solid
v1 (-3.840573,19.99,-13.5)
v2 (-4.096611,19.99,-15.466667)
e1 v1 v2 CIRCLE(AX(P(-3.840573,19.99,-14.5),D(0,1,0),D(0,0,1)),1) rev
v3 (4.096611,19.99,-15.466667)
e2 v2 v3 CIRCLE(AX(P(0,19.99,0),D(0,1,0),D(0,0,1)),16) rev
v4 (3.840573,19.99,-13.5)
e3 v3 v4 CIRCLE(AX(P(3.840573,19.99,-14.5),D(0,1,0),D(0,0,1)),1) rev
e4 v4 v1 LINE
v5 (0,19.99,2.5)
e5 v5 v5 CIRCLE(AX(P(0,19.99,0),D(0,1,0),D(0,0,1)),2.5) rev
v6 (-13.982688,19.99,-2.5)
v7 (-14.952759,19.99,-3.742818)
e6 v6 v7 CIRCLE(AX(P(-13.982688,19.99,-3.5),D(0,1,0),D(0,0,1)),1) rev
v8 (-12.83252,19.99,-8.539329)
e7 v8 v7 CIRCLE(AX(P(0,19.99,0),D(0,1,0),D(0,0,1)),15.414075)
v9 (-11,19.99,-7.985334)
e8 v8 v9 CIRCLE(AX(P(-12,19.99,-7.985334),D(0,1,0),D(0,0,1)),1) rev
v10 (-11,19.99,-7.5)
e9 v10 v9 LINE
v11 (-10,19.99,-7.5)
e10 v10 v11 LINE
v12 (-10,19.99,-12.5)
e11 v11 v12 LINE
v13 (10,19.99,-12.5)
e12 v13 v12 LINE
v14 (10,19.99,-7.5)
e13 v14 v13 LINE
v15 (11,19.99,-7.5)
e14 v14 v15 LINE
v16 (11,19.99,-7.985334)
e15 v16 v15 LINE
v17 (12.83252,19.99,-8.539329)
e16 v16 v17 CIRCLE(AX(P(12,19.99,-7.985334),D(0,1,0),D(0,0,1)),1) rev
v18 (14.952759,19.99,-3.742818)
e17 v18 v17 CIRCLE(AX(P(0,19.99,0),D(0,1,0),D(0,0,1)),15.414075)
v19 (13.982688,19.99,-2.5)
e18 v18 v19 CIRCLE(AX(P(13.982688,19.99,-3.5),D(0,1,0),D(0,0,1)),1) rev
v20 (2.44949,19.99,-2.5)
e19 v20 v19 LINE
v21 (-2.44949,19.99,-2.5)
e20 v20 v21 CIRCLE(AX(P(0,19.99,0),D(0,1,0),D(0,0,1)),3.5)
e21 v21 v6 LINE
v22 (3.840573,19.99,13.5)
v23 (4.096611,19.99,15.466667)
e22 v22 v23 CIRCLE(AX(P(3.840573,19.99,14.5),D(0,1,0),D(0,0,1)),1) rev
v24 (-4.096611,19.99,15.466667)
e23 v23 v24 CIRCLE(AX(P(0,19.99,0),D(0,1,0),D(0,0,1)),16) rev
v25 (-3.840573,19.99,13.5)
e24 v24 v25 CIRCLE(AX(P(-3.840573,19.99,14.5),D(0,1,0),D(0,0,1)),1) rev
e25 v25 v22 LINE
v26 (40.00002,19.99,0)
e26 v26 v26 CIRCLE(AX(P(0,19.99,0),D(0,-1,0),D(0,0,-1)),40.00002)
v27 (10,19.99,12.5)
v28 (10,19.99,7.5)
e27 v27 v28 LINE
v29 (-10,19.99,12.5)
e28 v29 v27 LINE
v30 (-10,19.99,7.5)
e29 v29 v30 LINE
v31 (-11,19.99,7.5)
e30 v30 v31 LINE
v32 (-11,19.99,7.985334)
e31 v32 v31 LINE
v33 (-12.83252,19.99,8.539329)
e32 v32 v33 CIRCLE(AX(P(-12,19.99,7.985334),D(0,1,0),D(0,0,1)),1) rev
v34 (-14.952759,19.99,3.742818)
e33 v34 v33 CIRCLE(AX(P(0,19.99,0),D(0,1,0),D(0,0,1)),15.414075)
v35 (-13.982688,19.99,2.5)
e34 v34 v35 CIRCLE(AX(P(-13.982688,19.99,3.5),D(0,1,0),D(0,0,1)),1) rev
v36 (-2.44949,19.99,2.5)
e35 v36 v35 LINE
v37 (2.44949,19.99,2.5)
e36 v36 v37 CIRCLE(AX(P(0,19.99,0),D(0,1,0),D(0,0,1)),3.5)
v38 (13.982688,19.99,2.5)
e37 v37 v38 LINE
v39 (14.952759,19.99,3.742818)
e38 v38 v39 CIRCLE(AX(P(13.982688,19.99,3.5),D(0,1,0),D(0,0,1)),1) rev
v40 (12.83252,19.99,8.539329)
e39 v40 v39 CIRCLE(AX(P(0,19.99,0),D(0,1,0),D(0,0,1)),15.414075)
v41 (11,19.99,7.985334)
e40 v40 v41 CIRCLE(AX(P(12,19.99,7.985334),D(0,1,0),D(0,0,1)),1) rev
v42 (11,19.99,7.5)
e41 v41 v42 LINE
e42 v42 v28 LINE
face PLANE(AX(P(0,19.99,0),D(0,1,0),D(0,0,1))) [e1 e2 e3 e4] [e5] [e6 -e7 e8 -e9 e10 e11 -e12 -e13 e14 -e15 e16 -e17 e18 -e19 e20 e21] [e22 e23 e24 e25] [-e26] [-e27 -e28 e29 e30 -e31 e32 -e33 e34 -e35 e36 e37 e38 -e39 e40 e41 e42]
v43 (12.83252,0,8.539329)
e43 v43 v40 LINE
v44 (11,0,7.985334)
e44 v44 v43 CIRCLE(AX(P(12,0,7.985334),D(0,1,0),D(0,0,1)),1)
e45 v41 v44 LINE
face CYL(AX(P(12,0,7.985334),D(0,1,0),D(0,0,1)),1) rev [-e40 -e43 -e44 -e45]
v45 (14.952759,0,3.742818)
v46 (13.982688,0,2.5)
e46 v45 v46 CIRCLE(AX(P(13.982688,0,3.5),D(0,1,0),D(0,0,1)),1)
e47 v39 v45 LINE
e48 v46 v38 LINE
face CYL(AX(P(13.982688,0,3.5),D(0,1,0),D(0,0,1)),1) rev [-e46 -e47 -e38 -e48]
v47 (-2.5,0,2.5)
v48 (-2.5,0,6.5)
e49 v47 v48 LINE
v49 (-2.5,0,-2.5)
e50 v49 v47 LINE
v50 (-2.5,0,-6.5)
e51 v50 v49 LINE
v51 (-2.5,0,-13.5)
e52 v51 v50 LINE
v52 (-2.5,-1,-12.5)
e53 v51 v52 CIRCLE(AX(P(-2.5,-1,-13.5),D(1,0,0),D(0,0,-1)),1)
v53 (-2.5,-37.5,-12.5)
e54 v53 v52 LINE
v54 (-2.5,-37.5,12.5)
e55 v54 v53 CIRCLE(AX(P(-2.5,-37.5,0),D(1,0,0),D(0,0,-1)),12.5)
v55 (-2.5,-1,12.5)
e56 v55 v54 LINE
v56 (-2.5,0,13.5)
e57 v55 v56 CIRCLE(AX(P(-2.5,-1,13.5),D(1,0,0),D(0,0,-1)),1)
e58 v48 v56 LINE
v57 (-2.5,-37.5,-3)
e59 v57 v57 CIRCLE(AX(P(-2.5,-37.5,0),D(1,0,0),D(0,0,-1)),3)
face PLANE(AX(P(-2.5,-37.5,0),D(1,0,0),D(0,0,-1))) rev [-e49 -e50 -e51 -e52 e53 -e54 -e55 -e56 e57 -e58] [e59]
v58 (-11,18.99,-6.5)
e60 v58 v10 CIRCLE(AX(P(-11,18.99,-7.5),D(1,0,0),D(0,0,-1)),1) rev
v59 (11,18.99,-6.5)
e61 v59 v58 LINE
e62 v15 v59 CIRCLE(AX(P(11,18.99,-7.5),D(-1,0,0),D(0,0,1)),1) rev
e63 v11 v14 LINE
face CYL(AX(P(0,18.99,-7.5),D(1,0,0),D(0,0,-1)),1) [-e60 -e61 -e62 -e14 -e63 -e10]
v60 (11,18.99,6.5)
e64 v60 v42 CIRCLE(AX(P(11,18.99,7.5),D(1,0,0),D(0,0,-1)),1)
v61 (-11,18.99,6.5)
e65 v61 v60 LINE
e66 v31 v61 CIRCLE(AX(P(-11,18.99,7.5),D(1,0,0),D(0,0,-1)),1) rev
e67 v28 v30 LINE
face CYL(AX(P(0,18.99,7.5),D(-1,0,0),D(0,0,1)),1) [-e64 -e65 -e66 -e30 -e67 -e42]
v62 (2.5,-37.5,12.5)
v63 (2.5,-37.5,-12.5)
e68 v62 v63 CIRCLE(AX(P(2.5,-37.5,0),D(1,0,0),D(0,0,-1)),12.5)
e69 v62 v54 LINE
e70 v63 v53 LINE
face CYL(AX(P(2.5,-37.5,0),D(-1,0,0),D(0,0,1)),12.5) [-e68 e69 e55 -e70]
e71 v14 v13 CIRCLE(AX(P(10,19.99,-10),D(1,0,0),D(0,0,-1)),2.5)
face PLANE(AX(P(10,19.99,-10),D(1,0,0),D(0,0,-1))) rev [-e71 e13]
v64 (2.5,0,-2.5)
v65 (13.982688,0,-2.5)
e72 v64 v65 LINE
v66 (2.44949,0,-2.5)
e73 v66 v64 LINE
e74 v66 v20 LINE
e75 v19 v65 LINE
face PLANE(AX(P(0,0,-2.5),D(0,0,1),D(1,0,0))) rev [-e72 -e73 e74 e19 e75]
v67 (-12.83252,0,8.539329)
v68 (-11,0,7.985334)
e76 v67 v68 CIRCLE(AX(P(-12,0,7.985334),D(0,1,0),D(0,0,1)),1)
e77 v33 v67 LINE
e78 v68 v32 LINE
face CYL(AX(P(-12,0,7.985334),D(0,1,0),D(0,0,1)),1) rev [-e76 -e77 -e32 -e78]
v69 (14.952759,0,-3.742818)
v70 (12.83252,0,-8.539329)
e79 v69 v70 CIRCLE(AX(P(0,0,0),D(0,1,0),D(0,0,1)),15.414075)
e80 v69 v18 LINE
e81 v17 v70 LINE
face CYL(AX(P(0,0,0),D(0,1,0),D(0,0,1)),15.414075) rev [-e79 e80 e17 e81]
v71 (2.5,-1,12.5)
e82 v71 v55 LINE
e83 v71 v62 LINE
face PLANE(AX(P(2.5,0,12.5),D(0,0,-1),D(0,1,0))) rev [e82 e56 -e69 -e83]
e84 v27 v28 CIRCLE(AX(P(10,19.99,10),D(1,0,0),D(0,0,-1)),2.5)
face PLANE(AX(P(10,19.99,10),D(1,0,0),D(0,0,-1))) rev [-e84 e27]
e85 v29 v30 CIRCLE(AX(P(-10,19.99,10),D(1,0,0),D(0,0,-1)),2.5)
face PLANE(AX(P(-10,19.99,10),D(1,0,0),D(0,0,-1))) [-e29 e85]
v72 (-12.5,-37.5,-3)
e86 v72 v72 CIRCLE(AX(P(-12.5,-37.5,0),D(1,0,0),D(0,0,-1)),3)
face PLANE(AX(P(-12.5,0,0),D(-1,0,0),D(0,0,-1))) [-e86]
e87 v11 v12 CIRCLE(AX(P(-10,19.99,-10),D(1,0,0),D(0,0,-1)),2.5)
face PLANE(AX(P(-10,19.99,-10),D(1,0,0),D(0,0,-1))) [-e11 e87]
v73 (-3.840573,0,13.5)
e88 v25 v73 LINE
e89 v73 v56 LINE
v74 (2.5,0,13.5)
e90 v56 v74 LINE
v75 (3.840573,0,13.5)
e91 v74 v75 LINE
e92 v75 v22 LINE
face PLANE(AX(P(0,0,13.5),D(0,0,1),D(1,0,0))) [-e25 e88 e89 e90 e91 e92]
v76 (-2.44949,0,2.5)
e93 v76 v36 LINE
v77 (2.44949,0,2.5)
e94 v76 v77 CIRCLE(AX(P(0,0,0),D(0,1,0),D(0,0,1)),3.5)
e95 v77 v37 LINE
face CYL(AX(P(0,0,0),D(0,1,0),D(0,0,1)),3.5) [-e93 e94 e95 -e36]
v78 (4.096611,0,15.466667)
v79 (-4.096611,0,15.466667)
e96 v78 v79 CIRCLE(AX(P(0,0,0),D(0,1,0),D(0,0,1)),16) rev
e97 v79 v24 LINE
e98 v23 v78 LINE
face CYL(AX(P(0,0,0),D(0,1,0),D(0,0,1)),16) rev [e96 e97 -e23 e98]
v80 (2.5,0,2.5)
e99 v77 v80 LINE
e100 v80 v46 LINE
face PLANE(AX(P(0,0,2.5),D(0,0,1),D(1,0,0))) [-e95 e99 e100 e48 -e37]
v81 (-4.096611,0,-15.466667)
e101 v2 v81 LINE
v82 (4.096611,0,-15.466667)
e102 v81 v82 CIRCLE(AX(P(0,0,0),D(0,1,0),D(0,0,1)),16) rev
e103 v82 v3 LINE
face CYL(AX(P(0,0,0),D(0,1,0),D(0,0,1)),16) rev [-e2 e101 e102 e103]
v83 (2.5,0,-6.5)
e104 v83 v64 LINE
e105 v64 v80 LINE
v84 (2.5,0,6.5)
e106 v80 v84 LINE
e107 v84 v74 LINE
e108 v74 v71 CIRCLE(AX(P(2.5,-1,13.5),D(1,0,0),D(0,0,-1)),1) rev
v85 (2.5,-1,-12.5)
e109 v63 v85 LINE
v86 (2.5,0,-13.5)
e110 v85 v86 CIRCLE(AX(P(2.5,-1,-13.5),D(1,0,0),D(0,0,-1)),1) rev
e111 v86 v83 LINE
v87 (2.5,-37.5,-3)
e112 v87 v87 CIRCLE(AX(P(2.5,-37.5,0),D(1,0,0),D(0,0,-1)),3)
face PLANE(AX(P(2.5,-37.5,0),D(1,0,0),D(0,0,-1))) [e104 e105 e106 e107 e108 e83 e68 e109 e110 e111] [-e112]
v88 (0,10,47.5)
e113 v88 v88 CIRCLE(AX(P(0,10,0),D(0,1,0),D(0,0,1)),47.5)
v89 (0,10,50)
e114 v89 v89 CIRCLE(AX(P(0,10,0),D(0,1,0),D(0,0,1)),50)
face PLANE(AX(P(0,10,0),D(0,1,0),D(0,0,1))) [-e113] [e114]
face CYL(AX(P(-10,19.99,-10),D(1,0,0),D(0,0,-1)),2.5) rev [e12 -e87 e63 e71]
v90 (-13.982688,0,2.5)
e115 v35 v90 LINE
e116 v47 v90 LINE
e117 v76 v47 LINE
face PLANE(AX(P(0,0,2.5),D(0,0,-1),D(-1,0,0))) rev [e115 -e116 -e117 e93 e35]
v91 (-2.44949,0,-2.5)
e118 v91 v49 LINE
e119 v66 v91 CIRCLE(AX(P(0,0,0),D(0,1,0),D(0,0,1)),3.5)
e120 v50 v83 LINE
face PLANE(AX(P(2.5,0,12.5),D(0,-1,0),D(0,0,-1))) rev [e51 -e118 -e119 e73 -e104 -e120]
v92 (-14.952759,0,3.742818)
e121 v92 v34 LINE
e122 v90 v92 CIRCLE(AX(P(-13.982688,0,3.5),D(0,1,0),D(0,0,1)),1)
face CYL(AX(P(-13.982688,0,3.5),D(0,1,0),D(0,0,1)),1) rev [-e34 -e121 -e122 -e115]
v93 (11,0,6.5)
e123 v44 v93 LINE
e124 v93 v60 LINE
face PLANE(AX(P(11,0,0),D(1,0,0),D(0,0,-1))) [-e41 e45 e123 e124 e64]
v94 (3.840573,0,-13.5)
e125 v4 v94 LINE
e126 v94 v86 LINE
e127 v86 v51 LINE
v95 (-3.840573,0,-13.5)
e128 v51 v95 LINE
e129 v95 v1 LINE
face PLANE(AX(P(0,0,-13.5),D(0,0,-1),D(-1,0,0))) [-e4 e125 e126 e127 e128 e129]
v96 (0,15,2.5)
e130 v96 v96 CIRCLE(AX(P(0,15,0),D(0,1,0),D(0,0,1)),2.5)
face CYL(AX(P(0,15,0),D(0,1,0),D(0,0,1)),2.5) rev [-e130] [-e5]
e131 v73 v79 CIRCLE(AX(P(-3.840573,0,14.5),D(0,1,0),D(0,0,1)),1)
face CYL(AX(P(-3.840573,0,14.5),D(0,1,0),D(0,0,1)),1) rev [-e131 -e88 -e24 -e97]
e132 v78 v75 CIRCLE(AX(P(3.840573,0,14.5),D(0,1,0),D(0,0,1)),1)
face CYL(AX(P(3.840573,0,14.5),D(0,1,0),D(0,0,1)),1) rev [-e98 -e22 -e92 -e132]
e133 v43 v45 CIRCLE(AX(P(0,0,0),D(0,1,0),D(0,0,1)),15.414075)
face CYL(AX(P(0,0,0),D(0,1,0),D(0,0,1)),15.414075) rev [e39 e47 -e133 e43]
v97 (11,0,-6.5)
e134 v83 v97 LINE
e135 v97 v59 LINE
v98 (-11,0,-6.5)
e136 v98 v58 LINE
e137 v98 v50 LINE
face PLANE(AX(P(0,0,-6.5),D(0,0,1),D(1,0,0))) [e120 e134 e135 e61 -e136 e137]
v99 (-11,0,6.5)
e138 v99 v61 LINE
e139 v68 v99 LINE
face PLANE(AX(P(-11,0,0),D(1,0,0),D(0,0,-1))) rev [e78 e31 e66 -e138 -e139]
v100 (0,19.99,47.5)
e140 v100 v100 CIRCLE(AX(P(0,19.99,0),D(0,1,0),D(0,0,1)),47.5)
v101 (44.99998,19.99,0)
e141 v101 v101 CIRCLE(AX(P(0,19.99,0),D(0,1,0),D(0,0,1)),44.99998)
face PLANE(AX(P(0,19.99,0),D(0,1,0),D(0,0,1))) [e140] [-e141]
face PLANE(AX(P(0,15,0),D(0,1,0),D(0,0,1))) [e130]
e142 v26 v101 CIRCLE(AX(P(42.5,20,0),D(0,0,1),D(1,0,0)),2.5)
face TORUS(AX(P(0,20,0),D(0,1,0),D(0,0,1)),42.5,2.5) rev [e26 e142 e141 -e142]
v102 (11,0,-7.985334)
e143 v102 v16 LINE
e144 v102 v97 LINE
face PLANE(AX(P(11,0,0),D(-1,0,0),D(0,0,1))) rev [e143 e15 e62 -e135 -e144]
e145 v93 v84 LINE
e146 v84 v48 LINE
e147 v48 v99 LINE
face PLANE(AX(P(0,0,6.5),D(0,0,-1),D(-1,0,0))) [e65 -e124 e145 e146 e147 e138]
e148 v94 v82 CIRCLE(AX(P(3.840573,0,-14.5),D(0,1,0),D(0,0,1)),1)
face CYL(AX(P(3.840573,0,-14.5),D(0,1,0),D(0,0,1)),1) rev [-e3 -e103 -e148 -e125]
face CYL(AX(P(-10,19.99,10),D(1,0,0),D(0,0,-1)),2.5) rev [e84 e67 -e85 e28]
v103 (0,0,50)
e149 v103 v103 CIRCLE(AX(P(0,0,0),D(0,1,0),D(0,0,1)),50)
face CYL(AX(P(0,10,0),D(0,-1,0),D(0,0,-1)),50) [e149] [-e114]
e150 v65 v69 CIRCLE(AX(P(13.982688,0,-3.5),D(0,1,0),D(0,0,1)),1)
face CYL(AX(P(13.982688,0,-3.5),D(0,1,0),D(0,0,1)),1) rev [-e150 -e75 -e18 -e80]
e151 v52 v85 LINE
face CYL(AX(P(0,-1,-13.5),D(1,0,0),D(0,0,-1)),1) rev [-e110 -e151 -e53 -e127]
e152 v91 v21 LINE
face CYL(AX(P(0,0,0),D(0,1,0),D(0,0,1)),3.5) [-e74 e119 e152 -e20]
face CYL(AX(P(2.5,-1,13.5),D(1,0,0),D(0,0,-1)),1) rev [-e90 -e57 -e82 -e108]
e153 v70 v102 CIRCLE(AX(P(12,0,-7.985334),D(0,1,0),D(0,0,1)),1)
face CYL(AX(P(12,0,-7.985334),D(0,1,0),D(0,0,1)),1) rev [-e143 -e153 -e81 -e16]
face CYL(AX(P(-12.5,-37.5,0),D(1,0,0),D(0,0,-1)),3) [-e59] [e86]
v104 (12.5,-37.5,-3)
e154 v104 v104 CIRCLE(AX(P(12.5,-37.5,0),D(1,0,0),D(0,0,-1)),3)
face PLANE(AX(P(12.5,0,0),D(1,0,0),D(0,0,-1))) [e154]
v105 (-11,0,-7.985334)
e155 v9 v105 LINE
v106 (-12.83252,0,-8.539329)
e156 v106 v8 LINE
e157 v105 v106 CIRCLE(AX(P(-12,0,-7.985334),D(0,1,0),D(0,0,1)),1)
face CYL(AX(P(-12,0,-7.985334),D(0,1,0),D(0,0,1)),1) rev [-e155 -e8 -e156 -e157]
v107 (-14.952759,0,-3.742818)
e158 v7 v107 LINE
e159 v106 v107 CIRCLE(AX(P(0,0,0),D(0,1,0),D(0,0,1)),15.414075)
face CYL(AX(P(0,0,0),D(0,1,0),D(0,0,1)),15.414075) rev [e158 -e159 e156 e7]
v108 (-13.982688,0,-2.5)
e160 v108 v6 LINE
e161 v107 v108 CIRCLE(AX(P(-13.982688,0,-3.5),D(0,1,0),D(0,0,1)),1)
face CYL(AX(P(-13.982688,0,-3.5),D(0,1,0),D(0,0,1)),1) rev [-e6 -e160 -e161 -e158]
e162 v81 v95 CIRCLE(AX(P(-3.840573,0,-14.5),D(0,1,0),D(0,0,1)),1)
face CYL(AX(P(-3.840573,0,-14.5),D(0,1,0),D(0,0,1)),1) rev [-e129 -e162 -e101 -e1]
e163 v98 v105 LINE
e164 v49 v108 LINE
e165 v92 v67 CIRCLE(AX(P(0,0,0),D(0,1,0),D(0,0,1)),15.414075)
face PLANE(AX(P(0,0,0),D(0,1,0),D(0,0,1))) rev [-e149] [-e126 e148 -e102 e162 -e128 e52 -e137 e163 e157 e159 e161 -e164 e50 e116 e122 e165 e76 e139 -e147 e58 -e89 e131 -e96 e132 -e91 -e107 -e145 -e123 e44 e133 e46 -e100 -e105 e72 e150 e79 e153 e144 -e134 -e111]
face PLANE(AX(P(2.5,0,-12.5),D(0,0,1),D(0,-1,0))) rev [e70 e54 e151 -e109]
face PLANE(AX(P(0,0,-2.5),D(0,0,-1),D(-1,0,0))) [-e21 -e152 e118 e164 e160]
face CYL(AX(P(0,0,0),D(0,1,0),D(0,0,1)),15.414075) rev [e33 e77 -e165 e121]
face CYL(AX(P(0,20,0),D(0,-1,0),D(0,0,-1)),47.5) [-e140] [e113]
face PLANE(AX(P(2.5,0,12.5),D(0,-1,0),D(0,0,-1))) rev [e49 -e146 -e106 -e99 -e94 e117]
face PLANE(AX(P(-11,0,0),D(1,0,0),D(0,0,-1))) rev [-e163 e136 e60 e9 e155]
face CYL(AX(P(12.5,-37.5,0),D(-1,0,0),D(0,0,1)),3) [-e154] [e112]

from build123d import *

# Parameters (mm, degrees)
SKETCH1_R           = 50
BOSS_EXTRUDE1_DEPTH = 10
SKETCH3_R           = 47.5
BOSS_EXTRUDE2_DEPTH = 10
SKETCH5_R           = 2.5
SKETCH6_R           = 2.5
CUT_EXTRUDE1_DEPTH  = 5
CUT_EXTRUDE2_START  = -0.01
SKETCH7_R           = 47.5
CUT_EXTRUDE2_DEPTH  = 0.01
SKETCH10_R          = 2.5
CUT_EXTRUDE4_DEPTH  = 10
CUT_EXTRUDE7_DEPTH  = 74.481971258
FILLET1_R           = 1
FILLET2_R           = 1
BOSS_EXTRUDE3_DEPTH = 2.5
FILLET3_R           = 1
FILLET4_START       = -12
FILLET4_DEPTH       = 24
FILLET5_R           = 1
SKETCH14_R          = 3
BOSS_EXTRUDE5_DEPTH = 10


with BuildPart() as part:
    # Sketch1 → Boss-Extrude1 (new body)
    with BuildSketch(Plane(origin=(0, 0, 0), x_dir=(1, 0, 0), z_dir=(0, 1, 0))):
        with Locations(Location((0, 0, 0), (0, 0, 270))):
            Circle(SKETCH1_R)
    extrude(amount=BOSS_EXTRUDE1_DEPTH)

    # Sketch3 → Boss-Extrude2 (add)
    with BuildSketch(Plane(origin=(0, 10, 0), x_dir=(1, 0, 0), z_dir=(0, 1, 0))):
        with Locations(Location((0, 0, 0), (0, 0, 270))):
            Circle(SKETCH3_R)
    extrude(amount=BOSS_EXTRUDE2_DEPTH)

    # Cut-Sweep1: sweep along a path in Sketch4
    with BuildLine(Plane(origin=(0, 20, 0), x_dir=(1, 0, 0), z_dir=(0, 1, 0))) as cut_sweep1_path:
        CenterArc((0, 0), 42.5, 0, 360)
    # Sketch5 → Cut-Sweep1 (sweep, cut)
    with BuildSketch(Plane.XY):
        with Locations((42.5, 20)):
            Circle(SKETCH5_R)
    sweep(path=cut_sweep1_path.line, mode=Mode.SUBTRACT)

    # Sketch6 → Cut-Extrude1 (cut)
    with BuildSketch(Plane(origin=(0, 20, 0), x_dir=(1, 0, 0), z_dir=(0, 1, 0))):
        with Locations(Location((0, 0, 0), (0, 0, 270))):
            Circle(SKETCH6_R)
    extrude(amount=-CUT_EXTRUDE1_DEPTH, mode=Mode.SUBTRACT)

    # Sketch7 → Cut-Extrude2 (cut)
    with BuildSketch(Plane(origin=(0, 20, 0), x_dir=(1, 0, 0), z_dir=(0, 1, 0)).offset(CUT_EXTRUDE2_START)):
        with Locations(Location((0, 0, 0), (0, 0, 270))):
            Circle(SKETCH7_R)
    extrude(amount=CUT_EXTRUDE2_DEPTH, mode=Mode.SUBTRACT)

    # Sketch10 → Cut-Extrude4 (cut, symmetric)
    with BuildSketch(Plane(origin=(0, 0, 0), x_dir=(0, 0, -1), z_dir=(1, 0, 0))):
        with Locations((-10, 19.99)):
            Circle(SKETCH10_R)
        with Locations((10, 19.99)):
            Circle(SKETCH10_R)
    extrude(amount=CUT_EXTRUDE4_DEPTH, both=True, mode=Mode.SUBTRACT)

    # Sketch11 → Cut-Extrude7 (cut, through all)
    with BuildSketch(Plane(origin=(0, 19.99, 0), x_dir=(1, 0, 0), z_dir=(0, 1, 0))):
        with BuildLine():
            ThreePointArc((-2.449489743, 2.5), (0, 3.5), (2.449489743, 2.5))
            Line((2.449489743, 2.5), (15.209986881, 2.5))
            ThreePointArc((15.209986881, 2.5), (13.746070636, 6.974184039), (11, 10.797856312))
            Line((11, 10.797856312), (11, 6.5))
            Line((11, 6.5), (-11, 6.5))
            Line((-11, 6.5), (-11, 10.797856312))
            ThreePointArc((-11, 10.797856312), (-13.746070636, 6.974184039), (-15.209986881, 2.5))
            Line((-15.209986881, 2.5), (-2.449489743, 2.5))
        make_face()
        with BuildLine():
            ThreePointArc((11, -10.797856312), (13.746070636, -6.974184039), (15.209986881, -2.5))
            Line((15.209986881, -2.5), (2.449489743, -2.5))
            ThreePointArc((2.449489743, -2.5), (0, -3.5), (-2.449489743, -2.5))
            Line((-2.449489743, -2.5), (-15.209986881, -2.5))
            ThreePointArc((-15.209986881, -2.5), (-13.746070636, -6.974184039), (-11, -10.797856312))
            Line((-11, -10.797856312), (-11, -6.5))
            Line((-11, -6.5), (11, -6.5))
            Line((11, -6.5), (11, -10.797856312))
        make_face()
        with BuildLine():
            ThreePointArc((-8.587782019, -13.5), (0, -16), (8.587782019, -13.5))
            Line((8.587782019, -13.5), (-8.587782019, -13.5))
        make_face()
        with BuildLine():
            Line((-8.587782019, 13.5), (8.587782019, 13.5))
            ThreePointArc((8.587782019, 13.5), (0, 16), (-8.587782019, 13.5))
        make_face()
    extrude(amount=-CUT_EXTRUDE7_DEPTH, mode=Mode.SUBTRACT)

    # Fillet1
    fillet1_edges = [part.edges().sort_by_distance(p)[0] for p in [
        (11, 9.995, 10.797856312),
        (-11, 9.995, 10.797856312),
        (-15.209986881, 9.995, 2.5),
        (15.209986881, 9.995, 2.5),
        (15.209986881, 9.995, -2.5),
        (-15.209986881, 9.995, -2.5),
        (-11, 9.995, -10.797856312),
        (11, 9.995, -10.797856312),
    ]]
    fillet(fillet1_edges, radius=FILLET1_R)

    # Fillet2
    fillet2_edges = [part.edges().sort_by_distance(p)[0] for p in [
        (-8.587782019, 9.995, -13.5),
        (8.587782019, 9.995, -13.5),
        (8.587782019, 9.995, 13.5),
        (-8.587782019, 9.995, 13.5),
    ]]
    fillet(fillet2_edges, radius=FILLET2_R)

    # Sketch13 → Boss-Extrude3 (add, symmetric)
    with BuildSketch(Plane(origin=(0, 0, 0), x_dir=(0, 0, -1), z_dir=(1, 0, 0))):
        with BuildLine():
            Line((-12.5, 0), (12.5, 0))
            Line((12.5, 0), (12.5, -37.5))
            ThreePointArc((12.5, -37.5), (0, -50), (-12.5, -37.5))
            Line((-12.5, -37.5), (-12.5, 0))
        make_face()
    extrude(amount=BOSS_EXTRUDE3_DEPTH, both=True)

    # Fillet3
    fillet3_edges = [part.edges().sort_by_distance(p)[0] for p in [
        (0, 0, -12.5),
        (0, 0, 12.5),
    ]]
    fillet(fillet3_edges, radius=FILLET3_R - 0.0001)  # a hair under: the kernel refuses the full size

    # Fillet4: read off the stored shape, not the designer's step
    # Fillet4 outline → Fillet4 (cut)
    with BuildSketch(Plane.YZ.offset(FILLET4_START)):
        with BuildLine():
            ThreePointArc((18.99, -6.5), (19.697106781, -6.792893219), (19.99, -7.5))
            Line((19.99, -7.5), (19.99, -6.5))
            Line((19.99, -6.5), (18.99, -6.5))
        make_face()
    extrude(amount=FILLET4_DEPTH, mode=Mode.SUBTRACT)

    # Fillet5
    fillet5_edges = [part.edges().sort_by_distance(p)[0] for p in [
        (0, 19.99, 6.5),
    ]]
    fillet(fillet5_edges, radius=FILLET5_R - 0.0001)  # a hair under: the kernel refuses the full size

    # Sketch14 → Boss-Extrude5 (add)
    with BuildSketch(Plane(origin=(2.5, 0, 0), x_dir=(0, 0, -1), z_dir=(1, 0, 0))):
        with Locations((0, -37.5)):
            Circle(SKETCH14_R)
    boss_extrude5 = extrude(amount=BOSS_EXTRUDE5_DEPTH)

    # Mirror2: Boss-Extrude5 across plane
    add(boss_extrude5.mirror(Plane(origin=(0, 0, 0), x_dir=(0, 0, 1), z_dir=(1, 0, 0))))


solid = part.part
